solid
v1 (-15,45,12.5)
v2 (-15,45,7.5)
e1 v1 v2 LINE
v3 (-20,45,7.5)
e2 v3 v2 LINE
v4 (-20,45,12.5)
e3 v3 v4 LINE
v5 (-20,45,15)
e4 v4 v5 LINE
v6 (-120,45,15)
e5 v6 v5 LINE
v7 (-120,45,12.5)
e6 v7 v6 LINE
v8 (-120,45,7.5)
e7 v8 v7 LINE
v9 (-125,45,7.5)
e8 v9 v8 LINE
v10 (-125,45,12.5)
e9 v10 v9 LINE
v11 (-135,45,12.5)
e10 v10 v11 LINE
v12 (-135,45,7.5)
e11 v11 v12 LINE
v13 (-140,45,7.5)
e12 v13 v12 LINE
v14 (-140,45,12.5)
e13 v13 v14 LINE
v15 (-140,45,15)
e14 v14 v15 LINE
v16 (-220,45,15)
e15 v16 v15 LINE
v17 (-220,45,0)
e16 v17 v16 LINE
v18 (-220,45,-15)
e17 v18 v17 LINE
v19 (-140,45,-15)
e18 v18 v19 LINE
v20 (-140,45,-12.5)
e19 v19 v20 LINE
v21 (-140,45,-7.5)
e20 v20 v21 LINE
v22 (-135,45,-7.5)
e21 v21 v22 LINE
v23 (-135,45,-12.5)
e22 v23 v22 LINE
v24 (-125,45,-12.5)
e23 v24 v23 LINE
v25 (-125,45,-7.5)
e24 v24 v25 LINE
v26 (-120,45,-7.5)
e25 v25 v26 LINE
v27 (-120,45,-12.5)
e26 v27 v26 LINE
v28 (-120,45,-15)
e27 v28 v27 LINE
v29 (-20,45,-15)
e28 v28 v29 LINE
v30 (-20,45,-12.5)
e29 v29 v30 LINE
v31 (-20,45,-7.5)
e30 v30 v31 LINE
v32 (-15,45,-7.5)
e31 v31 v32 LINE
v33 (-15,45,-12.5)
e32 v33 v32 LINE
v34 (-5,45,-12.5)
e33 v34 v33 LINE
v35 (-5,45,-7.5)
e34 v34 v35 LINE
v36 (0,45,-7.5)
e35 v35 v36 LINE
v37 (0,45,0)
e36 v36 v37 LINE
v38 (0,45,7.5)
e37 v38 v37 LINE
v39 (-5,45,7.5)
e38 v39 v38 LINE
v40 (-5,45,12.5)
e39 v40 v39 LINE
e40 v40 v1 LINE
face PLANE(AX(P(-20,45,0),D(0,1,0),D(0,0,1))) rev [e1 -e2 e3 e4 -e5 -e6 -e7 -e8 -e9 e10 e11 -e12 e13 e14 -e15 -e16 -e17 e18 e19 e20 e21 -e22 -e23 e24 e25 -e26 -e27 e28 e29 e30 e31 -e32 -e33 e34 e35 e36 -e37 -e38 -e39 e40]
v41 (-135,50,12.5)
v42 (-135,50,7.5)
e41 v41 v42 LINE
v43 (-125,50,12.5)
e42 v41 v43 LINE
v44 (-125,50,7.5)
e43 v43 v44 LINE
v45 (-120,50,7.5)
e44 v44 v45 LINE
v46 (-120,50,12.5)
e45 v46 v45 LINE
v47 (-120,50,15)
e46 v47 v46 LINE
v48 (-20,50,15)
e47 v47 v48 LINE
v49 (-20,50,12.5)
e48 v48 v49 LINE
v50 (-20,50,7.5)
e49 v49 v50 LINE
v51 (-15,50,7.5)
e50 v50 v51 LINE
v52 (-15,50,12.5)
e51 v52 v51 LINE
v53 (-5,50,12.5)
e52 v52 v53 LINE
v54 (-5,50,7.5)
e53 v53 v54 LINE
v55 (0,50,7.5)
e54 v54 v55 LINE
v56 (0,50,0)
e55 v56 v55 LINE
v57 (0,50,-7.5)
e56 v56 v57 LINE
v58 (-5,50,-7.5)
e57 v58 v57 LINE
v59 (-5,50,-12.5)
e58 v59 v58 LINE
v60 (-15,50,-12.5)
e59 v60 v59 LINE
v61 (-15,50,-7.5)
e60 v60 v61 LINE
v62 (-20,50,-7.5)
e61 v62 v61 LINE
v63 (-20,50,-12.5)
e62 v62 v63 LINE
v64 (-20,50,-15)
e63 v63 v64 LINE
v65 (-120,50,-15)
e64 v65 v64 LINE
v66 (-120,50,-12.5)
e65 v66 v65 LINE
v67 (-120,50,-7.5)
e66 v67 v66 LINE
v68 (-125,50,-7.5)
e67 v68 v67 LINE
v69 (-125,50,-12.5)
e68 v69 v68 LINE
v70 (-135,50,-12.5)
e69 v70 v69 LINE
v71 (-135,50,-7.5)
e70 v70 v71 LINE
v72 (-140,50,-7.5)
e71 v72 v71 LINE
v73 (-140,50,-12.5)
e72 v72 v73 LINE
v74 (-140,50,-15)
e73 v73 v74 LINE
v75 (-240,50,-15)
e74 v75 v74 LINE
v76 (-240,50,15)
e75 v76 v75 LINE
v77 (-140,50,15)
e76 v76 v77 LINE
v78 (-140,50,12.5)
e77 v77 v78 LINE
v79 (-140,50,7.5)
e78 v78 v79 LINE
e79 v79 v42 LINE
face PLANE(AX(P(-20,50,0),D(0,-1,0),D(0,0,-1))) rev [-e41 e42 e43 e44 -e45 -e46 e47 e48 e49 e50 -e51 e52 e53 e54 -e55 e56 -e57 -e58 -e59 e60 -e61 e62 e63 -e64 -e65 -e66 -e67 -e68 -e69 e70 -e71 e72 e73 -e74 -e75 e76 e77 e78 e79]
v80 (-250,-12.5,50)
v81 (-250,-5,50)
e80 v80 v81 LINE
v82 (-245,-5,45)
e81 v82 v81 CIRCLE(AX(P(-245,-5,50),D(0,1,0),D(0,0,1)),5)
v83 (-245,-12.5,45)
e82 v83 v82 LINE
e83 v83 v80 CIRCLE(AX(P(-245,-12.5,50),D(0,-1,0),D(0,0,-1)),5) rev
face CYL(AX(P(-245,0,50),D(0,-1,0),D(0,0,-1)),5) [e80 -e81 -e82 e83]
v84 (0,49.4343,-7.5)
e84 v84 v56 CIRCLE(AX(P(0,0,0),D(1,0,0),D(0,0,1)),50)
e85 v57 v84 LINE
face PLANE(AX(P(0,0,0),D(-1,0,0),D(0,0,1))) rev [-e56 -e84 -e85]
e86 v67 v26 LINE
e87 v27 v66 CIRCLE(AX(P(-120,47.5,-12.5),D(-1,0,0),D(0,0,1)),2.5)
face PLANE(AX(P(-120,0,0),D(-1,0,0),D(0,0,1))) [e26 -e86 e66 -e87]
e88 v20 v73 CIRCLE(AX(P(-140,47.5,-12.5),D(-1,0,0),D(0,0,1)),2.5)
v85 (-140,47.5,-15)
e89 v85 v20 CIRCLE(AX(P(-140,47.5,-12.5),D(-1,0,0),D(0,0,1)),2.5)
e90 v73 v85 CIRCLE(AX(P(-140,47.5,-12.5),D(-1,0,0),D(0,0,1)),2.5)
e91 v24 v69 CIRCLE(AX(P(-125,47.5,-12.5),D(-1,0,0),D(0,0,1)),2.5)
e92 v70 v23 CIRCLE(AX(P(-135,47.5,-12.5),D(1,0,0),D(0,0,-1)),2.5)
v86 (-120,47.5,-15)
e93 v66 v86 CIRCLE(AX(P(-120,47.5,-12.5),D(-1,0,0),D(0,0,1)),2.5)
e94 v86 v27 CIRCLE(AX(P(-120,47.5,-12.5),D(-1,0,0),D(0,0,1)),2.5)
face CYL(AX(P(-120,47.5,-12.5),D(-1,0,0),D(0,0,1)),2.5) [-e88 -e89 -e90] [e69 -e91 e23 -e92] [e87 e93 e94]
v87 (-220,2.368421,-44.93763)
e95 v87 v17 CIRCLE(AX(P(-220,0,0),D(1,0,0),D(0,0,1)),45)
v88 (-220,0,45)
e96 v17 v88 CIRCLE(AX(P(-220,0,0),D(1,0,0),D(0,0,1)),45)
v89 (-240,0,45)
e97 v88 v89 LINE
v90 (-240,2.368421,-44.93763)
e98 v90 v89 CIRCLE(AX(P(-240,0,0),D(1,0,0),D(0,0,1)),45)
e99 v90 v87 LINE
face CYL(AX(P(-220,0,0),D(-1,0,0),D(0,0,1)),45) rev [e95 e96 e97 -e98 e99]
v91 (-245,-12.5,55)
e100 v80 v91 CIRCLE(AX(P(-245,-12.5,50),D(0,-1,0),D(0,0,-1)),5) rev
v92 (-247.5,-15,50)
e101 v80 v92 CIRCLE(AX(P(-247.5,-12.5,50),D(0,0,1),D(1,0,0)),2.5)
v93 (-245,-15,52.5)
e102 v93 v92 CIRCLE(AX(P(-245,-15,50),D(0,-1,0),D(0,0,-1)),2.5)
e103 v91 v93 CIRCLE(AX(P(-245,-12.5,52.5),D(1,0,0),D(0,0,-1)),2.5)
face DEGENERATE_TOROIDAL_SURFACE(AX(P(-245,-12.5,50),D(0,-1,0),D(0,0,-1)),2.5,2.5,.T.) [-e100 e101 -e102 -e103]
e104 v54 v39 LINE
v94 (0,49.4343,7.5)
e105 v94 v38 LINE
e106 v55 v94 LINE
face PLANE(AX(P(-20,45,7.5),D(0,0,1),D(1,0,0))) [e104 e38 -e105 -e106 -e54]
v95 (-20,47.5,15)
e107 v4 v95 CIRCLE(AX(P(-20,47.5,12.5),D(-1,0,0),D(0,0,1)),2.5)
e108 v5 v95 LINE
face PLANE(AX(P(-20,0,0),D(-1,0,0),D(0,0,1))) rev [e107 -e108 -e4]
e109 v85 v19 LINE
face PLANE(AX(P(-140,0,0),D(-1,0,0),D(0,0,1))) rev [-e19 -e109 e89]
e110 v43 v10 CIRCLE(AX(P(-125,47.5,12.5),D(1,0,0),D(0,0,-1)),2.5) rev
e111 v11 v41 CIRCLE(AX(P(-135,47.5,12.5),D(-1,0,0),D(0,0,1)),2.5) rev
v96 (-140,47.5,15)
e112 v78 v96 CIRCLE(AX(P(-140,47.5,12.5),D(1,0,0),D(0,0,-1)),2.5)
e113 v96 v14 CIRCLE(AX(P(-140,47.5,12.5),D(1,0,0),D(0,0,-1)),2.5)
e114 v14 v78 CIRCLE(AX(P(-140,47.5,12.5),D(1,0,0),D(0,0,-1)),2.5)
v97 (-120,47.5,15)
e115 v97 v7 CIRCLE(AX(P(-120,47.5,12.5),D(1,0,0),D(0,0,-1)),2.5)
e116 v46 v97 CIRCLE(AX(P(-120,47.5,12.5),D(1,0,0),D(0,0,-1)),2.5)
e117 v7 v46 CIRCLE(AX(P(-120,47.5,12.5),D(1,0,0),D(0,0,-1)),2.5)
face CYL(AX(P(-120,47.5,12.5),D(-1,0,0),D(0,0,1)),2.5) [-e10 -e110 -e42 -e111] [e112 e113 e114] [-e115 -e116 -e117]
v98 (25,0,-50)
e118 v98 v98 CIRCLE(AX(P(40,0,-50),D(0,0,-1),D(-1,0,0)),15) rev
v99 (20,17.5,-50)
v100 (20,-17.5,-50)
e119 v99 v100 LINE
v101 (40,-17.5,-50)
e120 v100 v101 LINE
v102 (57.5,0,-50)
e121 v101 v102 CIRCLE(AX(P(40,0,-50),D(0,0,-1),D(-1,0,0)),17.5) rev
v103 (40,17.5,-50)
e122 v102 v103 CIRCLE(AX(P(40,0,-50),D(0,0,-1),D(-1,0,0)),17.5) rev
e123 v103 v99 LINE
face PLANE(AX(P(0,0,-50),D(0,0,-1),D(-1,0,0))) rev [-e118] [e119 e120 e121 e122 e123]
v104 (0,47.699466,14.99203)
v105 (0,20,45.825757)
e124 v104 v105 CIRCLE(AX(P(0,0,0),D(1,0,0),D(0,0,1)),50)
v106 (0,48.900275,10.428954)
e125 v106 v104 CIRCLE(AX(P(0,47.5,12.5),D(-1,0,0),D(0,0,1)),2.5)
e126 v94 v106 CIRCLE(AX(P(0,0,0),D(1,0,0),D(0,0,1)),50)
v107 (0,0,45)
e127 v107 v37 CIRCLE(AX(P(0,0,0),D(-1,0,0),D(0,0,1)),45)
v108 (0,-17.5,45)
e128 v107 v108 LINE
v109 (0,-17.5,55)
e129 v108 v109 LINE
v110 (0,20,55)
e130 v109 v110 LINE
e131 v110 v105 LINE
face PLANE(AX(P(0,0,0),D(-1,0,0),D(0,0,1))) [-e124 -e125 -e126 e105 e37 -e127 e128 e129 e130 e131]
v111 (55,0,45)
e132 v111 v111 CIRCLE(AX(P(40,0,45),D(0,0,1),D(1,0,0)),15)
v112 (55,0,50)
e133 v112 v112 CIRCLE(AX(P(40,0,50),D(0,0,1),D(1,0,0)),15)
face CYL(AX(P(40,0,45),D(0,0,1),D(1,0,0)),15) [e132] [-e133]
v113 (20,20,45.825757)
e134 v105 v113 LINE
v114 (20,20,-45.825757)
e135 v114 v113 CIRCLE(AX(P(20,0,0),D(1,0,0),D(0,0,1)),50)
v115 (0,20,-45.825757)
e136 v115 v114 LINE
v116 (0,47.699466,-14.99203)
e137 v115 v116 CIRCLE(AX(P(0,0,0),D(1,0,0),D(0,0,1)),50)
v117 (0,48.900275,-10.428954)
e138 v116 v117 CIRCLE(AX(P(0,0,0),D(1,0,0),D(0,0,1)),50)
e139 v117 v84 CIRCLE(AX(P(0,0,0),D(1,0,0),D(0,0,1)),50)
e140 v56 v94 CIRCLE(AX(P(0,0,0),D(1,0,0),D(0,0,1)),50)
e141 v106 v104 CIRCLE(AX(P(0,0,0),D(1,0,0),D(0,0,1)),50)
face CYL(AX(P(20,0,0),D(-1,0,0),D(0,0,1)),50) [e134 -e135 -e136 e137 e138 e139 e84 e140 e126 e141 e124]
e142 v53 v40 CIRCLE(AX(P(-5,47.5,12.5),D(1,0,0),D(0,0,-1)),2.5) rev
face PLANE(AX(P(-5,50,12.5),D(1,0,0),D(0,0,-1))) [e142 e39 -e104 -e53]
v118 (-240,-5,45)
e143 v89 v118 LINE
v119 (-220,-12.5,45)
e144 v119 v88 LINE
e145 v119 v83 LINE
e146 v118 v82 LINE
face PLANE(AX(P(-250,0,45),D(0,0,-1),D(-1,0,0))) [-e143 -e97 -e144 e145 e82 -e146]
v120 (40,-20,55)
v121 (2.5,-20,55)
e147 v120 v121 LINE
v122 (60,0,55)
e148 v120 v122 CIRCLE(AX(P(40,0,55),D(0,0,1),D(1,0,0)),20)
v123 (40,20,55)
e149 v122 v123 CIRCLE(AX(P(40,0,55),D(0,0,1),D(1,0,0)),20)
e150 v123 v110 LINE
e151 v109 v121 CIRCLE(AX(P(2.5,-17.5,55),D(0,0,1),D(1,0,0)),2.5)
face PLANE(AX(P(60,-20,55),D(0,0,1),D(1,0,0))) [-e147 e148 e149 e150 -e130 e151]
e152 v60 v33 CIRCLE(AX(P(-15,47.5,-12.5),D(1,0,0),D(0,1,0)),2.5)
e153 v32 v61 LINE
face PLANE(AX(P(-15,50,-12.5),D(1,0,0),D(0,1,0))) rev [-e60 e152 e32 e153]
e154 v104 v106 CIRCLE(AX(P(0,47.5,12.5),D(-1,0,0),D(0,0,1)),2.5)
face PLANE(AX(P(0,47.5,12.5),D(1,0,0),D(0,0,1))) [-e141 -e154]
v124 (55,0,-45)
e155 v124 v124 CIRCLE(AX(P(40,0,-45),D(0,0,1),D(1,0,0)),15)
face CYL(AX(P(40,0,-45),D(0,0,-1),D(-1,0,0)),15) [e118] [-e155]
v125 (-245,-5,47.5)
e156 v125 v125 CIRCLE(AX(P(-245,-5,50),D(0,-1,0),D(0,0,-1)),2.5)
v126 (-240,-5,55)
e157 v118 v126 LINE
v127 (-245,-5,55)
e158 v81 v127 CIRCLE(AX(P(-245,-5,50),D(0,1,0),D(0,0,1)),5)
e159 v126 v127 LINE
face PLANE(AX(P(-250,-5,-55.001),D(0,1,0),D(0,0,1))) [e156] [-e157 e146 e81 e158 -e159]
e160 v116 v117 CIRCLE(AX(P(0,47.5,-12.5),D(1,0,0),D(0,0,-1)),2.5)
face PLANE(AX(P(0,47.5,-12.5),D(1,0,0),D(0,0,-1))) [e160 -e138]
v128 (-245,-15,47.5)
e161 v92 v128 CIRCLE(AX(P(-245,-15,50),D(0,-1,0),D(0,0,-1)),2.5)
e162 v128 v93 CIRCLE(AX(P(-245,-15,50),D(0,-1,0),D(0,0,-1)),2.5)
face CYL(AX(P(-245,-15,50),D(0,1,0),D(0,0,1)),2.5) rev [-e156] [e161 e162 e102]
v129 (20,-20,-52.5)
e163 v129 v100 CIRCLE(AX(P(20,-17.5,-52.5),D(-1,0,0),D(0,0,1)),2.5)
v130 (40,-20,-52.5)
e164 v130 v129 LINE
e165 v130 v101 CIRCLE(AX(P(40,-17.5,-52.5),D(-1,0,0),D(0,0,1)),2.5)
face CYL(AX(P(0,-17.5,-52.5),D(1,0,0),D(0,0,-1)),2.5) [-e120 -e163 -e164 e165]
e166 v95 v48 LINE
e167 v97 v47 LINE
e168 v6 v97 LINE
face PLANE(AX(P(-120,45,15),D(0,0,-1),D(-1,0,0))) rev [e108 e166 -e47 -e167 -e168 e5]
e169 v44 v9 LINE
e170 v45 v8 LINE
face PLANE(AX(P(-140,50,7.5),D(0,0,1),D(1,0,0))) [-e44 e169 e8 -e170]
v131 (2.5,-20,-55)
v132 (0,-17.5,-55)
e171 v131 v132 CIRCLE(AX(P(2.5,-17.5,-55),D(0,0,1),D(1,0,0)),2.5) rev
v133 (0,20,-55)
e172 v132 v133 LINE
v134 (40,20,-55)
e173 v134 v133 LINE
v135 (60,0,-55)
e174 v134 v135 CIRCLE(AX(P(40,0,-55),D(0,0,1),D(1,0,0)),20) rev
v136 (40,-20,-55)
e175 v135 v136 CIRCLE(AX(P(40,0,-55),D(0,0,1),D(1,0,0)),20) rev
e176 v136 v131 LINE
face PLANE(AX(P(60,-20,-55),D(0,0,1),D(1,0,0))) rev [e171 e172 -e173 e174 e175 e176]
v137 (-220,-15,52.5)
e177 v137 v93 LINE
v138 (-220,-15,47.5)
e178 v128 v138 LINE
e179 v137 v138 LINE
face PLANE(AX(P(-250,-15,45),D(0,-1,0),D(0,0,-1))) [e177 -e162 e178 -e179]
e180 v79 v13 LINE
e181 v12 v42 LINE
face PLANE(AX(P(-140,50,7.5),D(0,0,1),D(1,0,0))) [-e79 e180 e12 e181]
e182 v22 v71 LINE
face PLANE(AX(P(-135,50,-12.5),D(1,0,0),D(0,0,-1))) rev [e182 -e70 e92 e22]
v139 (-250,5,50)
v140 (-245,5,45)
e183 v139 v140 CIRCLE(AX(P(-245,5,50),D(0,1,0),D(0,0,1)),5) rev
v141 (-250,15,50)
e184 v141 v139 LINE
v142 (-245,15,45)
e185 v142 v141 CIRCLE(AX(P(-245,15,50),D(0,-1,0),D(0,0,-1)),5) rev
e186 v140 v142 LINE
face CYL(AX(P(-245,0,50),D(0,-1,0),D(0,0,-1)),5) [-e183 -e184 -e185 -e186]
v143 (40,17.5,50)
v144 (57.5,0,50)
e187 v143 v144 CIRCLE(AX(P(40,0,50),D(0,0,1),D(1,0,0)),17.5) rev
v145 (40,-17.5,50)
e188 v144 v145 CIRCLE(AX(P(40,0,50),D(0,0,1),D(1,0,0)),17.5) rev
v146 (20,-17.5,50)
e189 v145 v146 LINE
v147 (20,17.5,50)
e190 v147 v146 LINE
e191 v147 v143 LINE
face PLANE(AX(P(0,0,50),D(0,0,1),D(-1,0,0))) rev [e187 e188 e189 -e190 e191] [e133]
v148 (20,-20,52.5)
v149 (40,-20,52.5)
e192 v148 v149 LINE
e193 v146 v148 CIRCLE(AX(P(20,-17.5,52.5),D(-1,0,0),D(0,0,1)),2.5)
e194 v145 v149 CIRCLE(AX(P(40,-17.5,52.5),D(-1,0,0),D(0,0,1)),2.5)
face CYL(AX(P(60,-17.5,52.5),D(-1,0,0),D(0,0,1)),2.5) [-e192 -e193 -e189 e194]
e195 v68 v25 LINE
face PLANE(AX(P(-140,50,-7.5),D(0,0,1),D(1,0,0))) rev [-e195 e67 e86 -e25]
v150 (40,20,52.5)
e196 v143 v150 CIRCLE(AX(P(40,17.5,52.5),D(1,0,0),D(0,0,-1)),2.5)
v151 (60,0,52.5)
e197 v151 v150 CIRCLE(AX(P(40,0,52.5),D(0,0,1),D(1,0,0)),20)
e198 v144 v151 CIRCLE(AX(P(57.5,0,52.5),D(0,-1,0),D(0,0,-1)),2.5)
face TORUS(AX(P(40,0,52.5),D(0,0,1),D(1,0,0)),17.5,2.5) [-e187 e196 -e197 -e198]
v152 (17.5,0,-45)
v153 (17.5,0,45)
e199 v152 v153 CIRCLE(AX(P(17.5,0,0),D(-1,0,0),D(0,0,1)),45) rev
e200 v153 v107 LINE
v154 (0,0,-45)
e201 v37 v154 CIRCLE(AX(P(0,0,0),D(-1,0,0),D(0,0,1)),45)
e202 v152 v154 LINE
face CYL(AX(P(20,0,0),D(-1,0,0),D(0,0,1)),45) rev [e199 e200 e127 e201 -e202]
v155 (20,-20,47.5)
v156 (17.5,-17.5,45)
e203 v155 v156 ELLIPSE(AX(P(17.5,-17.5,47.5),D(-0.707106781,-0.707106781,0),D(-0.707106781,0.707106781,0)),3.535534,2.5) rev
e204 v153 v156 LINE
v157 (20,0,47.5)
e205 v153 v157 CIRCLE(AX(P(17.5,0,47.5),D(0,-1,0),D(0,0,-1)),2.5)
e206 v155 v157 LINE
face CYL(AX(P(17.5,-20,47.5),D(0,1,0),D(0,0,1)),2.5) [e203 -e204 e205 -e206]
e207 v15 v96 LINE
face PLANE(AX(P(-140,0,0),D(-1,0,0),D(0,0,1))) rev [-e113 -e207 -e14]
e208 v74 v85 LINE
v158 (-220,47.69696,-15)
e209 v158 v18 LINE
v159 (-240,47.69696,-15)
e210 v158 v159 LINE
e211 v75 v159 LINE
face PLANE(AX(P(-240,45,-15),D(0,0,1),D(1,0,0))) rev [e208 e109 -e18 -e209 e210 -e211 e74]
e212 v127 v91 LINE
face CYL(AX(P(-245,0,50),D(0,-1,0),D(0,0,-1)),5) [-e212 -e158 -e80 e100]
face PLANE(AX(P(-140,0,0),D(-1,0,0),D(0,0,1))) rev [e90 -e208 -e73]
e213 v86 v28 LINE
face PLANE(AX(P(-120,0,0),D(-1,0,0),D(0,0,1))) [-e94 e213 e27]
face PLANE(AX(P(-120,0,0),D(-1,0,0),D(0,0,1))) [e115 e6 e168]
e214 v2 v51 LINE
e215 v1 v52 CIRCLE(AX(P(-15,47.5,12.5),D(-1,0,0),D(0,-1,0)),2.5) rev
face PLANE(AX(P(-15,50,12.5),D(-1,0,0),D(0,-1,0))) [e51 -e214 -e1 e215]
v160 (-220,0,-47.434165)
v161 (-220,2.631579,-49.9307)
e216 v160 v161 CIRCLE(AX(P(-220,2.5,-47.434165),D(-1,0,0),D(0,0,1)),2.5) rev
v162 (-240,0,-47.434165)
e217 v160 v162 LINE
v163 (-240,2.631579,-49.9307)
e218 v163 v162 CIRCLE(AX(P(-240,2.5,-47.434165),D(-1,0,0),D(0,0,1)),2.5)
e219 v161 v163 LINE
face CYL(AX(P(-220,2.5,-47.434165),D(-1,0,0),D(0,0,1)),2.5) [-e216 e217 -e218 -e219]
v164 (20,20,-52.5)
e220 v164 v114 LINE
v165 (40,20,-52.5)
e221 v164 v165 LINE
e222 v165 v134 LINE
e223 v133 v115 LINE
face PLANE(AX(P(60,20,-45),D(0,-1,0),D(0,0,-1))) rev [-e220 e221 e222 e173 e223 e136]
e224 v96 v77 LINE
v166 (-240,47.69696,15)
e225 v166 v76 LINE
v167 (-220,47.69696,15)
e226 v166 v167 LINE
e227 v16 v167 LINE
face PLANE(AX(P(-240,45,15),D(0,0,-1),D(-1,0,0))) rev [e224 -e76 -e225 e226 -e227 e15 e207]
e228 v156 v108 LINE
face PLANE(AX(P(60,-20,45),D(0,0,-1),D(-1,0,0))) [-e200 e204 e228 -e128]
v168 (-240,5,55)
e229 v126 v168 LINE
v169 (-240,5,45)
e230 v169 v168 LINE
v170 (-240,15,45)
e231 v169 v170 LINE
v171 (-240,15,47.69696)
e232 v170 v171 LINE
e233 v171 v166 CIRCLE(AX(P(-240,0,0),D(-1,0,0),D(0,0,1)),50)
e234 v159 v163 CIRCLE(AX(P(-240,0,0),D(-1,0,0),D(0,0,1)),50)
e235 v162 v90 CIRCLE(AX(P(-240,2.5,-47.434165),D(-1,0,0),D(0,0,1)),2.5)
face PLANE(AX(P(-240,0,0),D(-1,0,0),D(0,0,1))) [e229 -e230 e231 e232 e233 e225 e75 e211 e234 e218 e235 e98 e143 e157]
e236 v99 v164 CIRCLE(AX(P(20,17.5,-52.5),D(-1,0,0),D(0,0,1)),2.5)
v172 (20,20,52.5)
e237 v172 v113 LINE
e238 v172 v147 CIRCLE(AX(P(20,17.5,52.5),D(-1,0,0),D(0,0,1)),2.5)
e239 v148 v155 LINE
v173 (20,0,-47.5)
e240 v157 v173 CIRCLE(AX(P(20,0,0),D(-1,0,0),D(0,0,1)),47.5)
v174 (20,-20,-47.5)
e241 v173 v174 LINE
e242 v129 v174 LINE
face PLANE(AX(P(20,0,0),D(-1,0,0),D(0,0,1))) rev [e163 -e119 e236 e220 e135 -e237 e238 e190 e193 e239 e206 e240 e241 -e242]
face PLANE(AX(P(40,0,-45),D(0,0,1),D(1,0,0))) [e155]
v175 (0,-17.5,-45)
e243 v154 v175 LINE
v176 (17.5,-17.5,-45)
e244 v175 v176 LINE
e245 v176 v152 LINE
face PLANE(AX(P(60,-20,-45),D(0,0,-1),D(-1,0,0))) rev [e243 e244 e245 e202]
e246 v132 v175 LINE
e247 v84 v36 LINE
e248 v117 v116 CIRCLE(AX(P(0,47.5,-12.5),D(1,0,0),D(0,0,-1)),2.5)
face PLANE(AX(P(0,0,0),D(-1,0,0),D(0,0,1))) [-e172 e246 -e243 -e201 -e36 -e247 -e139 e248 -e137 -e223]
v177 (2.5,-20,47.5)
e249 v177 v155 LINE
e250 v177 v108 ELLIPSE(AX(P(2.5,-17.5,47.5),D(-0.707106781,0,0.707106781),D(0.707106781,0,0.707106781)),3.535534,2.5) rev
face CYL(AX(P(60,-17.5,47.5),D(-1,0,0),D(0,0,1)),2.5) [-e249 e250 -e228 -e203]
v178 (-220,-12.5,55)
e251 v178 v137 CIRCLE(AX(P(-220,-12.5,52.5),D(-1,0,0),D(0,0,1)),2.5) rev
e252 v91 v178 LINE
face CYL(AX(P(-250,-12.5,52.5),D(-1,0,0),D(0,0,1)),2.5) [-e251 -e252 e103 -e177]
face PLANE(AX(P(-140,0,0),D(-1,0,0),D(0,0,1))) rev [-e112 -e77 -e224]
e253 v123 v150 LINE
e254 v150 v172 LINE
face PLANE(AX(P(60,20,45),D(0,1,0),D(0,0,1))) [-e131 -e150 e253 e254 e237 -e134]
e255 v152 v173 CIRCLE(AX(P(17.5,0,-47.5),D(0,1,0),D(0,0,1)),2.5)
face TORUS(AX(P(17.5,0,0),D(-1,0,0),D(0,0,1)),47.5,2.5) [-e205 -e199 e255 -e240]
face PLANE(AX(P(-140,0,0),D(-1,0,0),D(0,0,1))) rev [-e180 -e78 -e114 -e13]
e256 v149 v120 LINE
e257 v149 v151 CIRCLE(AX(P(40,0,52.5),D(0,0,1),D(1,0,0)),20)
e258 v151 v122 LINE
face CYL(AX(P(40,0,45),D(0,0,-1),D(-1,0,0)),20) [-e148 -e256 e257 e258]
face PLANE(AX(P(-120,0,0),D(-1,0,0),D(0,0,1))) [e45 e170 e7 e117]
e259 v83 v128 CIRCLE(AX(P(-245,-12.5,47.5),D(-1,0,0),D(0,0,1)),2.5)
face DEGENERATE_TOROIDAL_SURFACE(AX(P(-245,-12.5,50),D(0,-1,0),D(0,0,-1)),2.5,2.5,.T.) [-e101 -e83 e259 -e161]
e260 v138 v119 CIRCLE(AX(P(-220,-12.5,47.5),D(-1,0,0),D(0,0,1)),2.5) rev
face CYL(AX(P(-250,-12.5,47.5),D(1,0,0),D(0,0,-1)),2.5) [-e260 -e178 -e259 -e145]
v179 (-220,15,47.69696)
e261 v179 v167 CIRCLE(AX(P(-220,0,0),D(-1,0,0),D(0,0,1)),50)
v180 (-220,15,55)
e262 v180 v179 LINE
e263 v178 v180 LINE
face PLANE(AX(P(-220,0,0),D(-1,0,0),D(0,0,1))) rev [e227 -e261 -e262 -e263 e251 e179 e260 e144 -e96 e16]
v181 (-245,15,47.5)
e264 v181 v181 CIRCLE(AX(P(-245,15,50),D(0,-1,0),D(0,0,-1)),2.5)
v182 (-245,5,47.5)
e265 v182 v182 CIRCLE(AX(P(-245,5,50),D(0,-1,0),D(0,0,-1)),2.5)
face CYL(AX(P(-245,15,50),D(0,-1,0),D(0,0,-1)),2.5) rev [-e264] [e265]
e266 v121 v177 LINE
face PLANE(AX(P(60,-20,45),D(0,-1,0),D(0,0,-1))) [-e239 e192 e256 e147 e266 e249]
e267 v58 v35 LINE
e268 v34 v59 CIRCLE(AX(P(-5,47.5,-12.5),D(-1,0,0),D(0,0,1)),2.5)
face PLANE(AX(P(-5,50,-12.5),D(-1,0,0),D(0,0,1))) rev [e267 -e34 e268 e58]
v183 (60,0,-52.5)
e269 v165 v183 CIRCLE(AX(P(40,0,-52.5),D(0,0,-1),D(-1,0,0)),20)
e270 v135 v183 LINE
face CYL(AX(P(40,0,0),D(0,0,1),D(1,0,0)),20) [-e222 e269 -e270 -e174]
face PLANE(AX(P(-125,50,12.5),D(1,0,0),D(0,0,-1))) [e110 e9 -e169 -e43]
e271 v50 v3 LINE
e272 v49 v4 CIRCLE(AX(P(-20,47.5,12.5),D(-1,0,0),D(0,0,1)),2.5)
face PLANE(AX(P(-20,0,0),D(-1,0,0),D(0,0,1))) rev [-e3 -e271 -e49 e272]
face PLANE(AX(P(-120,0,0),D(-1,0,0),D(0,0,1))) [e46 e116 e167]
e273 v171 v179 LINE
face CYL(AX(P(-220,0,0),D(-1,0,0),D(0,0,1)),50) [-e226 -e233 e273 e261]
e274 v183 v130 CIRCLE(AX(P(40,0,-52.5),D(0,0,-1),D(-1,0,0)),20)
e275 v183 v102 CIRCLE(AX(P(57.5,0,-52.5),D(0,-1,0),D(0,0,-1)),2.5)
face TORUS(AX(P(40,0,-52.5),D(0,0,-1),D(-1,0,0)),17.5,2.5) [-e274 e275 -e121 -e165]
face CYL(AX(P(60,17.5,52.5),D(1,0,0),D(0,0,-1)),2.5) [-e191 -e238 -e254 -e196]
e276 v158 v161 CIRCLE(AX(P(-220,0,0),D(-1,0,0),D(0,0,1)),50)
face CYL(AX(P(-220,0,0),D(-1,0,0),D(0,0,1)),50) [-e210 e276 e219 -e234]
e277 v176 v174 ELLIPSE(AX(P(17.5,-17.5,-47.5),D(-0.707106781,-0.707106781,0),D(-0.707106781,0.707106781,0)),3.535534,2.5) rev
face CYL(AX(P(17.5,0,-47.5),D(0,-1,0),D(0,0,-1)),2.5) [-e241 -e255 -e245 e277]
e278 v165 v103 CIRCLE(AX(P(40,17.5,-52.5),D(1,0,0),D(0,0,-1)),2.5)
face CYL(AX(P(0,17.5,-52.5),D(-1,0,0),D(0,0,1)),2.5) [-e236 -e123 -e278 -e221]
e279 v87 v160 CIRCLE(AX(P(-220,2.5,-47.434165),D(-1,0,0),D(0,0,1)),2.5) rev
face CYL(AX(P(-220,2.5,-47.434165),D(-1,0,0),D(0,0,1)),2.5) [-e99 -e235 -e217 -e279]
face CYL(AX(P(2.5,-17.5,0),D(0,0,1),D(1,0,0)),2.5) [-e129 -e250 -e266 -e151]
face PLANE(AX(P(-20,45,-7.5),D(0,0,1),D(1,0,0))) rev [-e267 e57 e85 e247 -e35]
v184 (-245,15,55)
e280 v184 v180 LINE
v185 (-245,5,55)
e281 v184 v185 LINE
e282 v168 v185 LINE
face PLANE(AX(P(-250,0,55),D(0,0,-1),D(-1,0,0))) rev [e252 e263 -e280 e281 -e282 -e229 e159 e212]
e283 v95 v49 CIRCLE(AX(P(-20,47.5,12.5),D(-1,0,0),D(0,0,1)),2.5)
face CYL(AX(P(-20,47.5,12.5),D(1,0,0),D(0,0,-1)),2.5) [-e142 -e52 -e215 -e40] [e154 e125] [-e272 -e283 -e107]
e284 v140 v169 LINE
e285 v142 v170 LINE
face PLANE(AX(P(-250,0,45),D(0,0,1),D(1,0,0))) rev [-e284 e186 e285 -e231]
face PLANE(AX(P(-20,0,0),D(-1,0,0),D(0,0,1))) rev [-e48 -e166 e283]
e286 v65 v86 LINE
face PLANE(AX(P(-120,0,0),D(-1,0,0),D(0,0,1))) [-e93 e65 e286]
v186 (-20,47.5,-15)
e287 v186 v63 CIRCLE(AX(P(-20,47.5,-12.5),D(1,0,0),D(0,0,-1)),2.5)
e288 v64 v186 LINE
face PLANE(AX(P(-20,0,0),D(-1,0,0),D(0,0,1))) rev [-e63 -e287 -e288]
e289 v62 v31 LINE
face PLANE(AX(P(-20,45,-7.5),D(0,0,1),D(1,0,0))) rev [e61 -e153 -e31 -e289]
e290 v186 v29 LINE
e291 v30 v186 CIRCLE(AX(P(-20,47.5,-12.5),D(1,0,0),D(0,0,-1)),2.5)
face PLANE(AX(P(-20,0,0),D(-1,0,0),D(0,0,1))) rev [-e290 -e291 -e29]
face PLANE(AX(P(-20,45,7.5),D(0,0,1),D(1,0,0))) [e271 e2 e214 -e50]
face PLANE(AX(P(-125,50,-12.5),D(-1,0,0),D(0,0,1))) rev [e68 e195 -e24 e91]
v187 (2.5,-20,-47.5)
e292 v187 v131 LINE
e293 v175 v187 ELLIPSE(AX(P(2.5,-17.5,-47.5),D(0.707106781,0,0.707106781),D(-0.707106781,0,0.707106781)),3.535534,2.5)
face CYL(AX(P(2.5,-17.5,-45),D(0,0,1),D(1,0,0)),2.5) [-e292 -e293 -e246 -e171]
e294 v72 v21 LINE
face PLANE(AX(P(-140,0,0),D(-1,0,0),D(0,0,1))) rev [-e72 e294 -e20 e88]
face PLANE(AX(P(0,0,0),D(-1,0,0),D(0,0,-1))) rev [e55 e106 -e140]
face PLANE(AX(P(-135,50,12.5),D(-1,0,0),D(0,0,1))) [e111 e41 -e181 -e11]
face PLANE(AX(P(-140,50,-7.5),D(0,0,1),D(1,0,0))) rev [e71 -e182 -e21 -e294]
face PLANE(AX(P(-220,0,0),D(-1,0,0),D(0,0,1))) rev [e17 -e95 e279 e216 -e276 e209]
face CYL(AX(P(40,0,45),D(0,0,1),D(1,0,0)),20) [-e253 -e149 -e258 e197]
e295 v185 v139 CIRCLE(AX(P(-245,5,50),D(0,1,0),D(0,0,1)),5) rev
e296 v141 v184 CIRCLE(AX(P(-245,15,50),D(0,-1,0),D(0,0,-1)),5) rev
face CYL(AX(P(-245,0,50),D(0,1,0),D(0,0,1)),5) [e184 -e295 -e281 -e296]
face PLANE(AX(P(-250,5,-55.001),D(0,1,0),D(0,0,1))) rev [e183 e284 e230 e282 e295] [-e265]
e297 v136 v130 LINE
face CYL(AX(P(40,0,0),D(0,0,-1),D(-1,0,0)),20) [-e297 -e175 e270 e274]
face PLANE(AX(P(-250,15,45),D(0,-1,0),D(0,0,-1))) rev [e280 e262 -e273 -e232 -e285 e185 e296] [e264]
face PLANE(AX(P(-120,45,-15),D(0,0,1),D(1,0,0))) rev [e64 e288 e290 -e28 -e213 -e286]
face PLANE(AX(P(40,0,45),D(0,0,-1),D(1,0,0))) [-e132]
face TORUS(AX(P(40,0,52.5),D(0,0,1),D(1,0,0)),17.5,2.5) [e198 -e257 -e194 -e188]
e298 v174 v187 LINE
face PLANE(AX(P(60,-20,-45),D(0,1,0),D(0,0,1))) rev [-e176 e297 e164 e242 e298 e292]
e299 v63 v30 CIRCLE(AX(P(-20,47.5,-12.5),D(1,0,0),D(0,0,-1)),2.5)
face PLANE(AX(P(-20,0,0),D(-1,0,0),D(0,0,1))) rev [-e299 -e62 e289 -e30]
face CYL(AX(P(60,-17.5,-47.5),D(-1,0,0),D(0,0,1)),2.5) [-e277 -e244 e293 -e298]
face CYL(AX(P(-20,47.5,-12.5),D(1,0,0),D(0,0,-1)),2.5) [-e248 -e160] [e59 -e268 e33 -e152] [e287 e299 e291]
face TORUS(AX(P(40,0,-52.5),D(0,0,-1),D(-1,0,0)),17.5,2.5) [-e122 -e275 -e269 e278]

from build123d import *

# Parameters (mm, degrees)
BOSS_EXTRUDE1_DEPTH  = 20
SKETCH3_W            = 10
SKETCH3_H            = 40
BOSS_EXTRUDE2_DEPTH  = 60
SKETCH4_W            = 40
SKETCH4_H            = 40
CUT_EXTRUDE1_DEPTH   = 5
SKETCH5_R            = 15
BOSS_EXTRUDE3_DEPTH  = 5
SKETCH6_W            = 7.5
SKETCH6_H            = 5
BOSS_EXTRUDE4_DEPTH  = 20
SKETCH7_W            = 10
SKETCH7_H            = 5
BOSS_EXTRUDE5_DEPTH  = 5
SKETCH9_R            = 2.5
BOSS_EXTRUDE6_DEPTH  = 20
FILLET2_R            = 2.5
FILLET3_R            = 20
FILLET4_R            = 2.5
SKETCH10_W           = 30
SKETCH10_H           = 5
BOSS_EXTRUDE9_DEPTH  = 100
SKETCH12_W           = 7.5
SKETCH12_H           = 5
BOSS_EXTRUDE10_DEPTH = 20
SKETCH13_W           = 10
SKETCH13_H           = 5
BOSS_EXTRUDE11_DEPTH = 5
BOSS_EXTRUDE12_START = -15
SKETCH14_R           = 2.5
BOSS_EXTRUDE12_DEPTH = 20
SKETCH15_W           = 30
SKETCH15_H           = 5
BOSS_EXTRUDE13_DEPTH = 100
BOSS_EXTRUDE14_DEPTH = 20
BOSS_EXTRUDE15_START = -20
SKETCH17_W           = 10
SKETCH17_H           = 15
BOSS_EXTRUDE15_DEPTH = 30
CUT_EXTRUDE2_REACH   = 279.669
SKETCH18_W           = 10
SKETCH18_H           = 5
SKETCH19_R           = 2.5
CUT_EXTRUDE3_DEPTH   = 10
FILLET5_R            = 5
FILLET6_R            = 2.5


# Some blends are built 0.0001 mm under size
with BuildPart() as part:
    # Sketch1 → Boss-Extrude1 (new body)
    with BuildSketch(Plane(origin=(0, 0, 0), x_dir=(0, 0, -1), z_dir=(1, 0, 0))):
        with BuildLine():
            Line((-45, 0), (-50, 0))
            ThreePointArc((-50, 0), (0, 50), (50, 0))
            Line((50, 0), (45, 0))
            ThreePointArc((45, 0), (0, 45), (-45, 0))
        make_face()
    extrude(amount=BOSS_EXTRUDE1_DEPTH)

    # Sketch3 → Boss-Extrude2 (add)
    with BuildSketch(Plane(origin=(0, 0, 0), x_dir=(0, 0, -1), z_dir=(1, 0, 0))):
        with Locations((50, 0)):
            Rectangle(SKETCH3_W, SKETCH3_H)
    boss_extrude2 = extrude(amount=BOSS_EXTRUDE2_DEPTH)

    # Sketch4 → Cut-Extrude1 (cut)
    with BuildSketch(Plane.XY.offset(-45)):
        with Locations((40, 0)):
            Rectangle(SKETCH4_W, SKETCH4_H)
    cut_extrude1 = extrude(amount=-CUT_EXTRUDE1_DEPTH, mode=Mode.SUBTRACT)

    # Sketch5 → Boss-Extrude3 (add)
    with BuildSketch(Plane.XY.offset(-50)):
        with Locations(Location((40, 0, 0), (0, 0, 180))):
            Circle(SKETCH5_R)
    boss_extrude3 = extrude(amount=BOSS_EXTRUDE3_DEPTH)

    # Sketch6 → Boss-Extrude4 (add)
    with BuildSketch(Plane.ZY):
        with Locations((-3.75, 47.5)):
            Rectangle(SKETCH6_W, SKETCH6_H)
    boss_extrude4 = extrude(amount=BOSS_EXTRUDE4_DEPTH)

    # Sketch7 → Boss-Extrude5 (add)
    with BuildSketch(Plane(origin=(0, 0, -7.5), x_dir=(-1, 0, 0), z_dir=(0, 0, -1))):
        with Locations((10, 47.5)):
            Rectangle(SKETCH7_W, SKETCH7_H)
    boss_extrude5 = extrude(amount=BOSS_EXTRUDE5_DEPTH)

    # Sketch9 → Boss-Extrude6 (add)
    with BuildSketch(Plane(origin=(0, 0, 0), x_dir=(0, 0, -1), z_dir=(1, 0, 0))):
        with Locations((12.5, 47.5)):
            Circle(SKETCH9_R)
    boss_extrude6 = extrude(amount=-BOSS_EXTRUDE6_DEPTH)

    # Mirror1: Boss-Extrude2, Cut-Extrude1, Boss-Extrude3, Boss-Extrude4, Boss-Extrude5, Boss-Extrude6 across plane
    add(boss_extrude2.mirror(Plane.XY))
    add(cut_extrude1.mirror(Plane.XY), mode=Mode.SUBTRACT)
    add(boss_extrude3.mirror(Plane.XY))
    add(boss_extrude4.mirror(Plane.XY))
    add(boss_extrude5.mirror(Plane.XY))
    add(boss_extrude6.mirror(Plane.XY))

    # Fillet2
    fillet2_edges = [part.edges().sort_by_distance(p)[0] for p in [
        (20, 45, 0),
        (10, -20, 45),
        (20, -10, 45),
        (0, -20, -50),
        (10, -20, -45),
        (20, -10, -45),
        (0, -20, 50),
    ]]
    fillet(fillet2_edges, radius=FILLET2_R)

    # Fillet3
    fillet3_edges = [part.edges().sort_by_distance(p)[0] for p in [
        (60, -20, -52.5),
        (60, 20, -52.5),
        (60, -20, 52.5),
        (60, 20, 52.5),
    ]]
    fillet(fillet3_edges, radius=FILLET3_R - 0.0001)  # a hair under: the kernel refuses the full size

    # Fillet4
    fillet4_edges = [part.edges().sort_by_distance(p)[0] for p in [
        (30.00005, -20, 50),
        (30.00005, 20, -50),
        (54.142164913, 14.142164913, -50),
        (54.142164913, -14.142164913, -50),
        (30.00005, 20, 50),
        (54.142164913, 14.142164913, 50),
        (54.142164913, -14.142164913, 50),
        (30.00005, -20, -50),
    ]]
    fillet(fillet4_edges, radius=FILLET4_R)

    # Sketch10 → Boss-Extrude9 (add)
    with BuildSketch(Plane.ZY.offset(20)):
        with Locations((0, 47.5)):
            Rectangle(SKETCH10_W, SKETCH10_H)
    extrude(amount=BOSS_EXTRUDE9_DEPTH)

    # Sketch12 → Boss-Extrude10 (add)
    with BuildSketch(Plane.ZY.offset(120)):
        with Locations((-3.75, 47.5)):
            Rectangle(SKETCH12_W, SKETCH12_H)
    boss_extrude10 = extrude(amount=BOSS_EXTRUDE10_DEPTH)

    # Sketch13 → Boss-Extrude11 (add)
    with BuildSketch(Plane(origin=(0, 0, -7.5), x_dir=(-1, 0, 0), z_dir=(0, 0, -1))):
        with Locations((130, 47.5)):
            Rectangle(SKETCH13_W, SKETCH13_H)
    boss_extrude11 = extrude(amount=BOSS_EXTRUDE11_DEPTH)

    # Sketch14 → Boss-Extrude12 (add)
    with BuildSketch(Plane.ZY.offset(135).offset(BOSS_EXTRUDE12_START)):
        with Locations(Location((-12.5, 47.5, 0), (0, 0, 180))):
            Circle(SKETCH14_R)
    boss_extrude12 = extrude(amount=BOSS_EXTRUDE12_DEPTH)

    # Mirror2: Boss-Extrude10, Boss-Extrude11, Boss-Extrude12 across plane
    add(boss_extrude10.mirror(Plane(origin=(-140, 50, 0), x_dir=(1, 0, 0), z_dir=(0, 0, -1))))
    add(boss_extrude11.mirror(Plane(origin=(-140, 50, 0), x_dir=(1, 0, 0), z_dir=(0, 0, -1))))
    add(boss_extrude12.mirror(Plane(origin=(-140, 50, 0), x_dir=(1, 0, 0), z_dir=(0, 0, -1))))

    # Sketch15 → Boss-Extrude13 (add)
    with BuildSketch(Plane.ZY.offset(140)):
        with Locations((0, 47.5)):
            Rectangle(SKETCH15_W, SKETCH15_H)
    extrude(amount=BOSS_EXTRUDE13_DEPTH)

    # Sketch16 → Boss-Extrude14 (add)
    with BuildSketch(Plane.ZY.offset(240)):
        with BuildLine():
            Line((50, 0), (45, 0))
            ThreePointArc((45, 0), (0, 45), (-45, 0))
            Line((-45, 0), (-50, 0))
            ThreePointArc((-50, 0), (0, 50), (50, 0))
        make_face()
    extrude(amount=-BOSS_EXTRUDE14_DEPTH)

    # Sketch17 → Boss-Extrude15 (add)
    with BuildSketch(Plane.ZY.offset(240).offset(BOSS_EXTRUDE15_START)):
        with Locations((50, 7.5)):
            Rectangle(SKETCH17_W, SKETCH17_H)
    boss_extrude15 = extrude(amount=BOSS_EXTRUDE15_DEPTH)

    # Sketch18 → Cut-Extrude2 (cut, up to next)
    with BuildSketch(Plane.XY.offset(55), mode=Mode.PRIVATE) as cut_extrude2_sk1:
        with Locations((-245, 2.5)):
            Rectangle(SKETCH18_W, SKETCH18_H)
    cut_extrude2_tool1 = extrude(cut_extrude2_sk1.sketch, amount=-CUT_EXTRUDE2_REACH, mode=Mode.PRIVATE) & part.part
    cut_extrude2 = cut_extrude2_tool1.solids().sort_by_distance((-245, 2.5, 55))[0]
    add(cut_extrude2, mode=Mode.SUBTRACT)

    # Sketch19 → Cut-Extrude3 (cut)
    with BuildSketch(Plane.XZ.offset(-5)):
        with Locations(Location((-245, 50, 0), (0, 0, 270))):
            Circle(SKETCH19_R)
    cut_extrude3 = extrude(amount=-CUT_EXTRUDE3_DEPTH, mode=Mode.SUBTRACT)

    # Mirror3: Boss-Extrude15, Cut-Extrude2, Cut-Extrude3 across Top Plane
    add(boss_extrude15.mirror(Plane(origin=(0, 0, 0), x_dir=(1, 0, 0), z_dir=(0, 1, 0))))
    add(cut_extrude2.mirror(Plane(origin=(0, 0, 0), x_dir=(1, 0, 0), z_dir=(0, 1, 0))), mode=Mode.SUBTRACT)
    add(cut_extrude3.mirror(Plane(origin=(0, 0, 0), x_dir=(1, 0, 0), z_dir=(0, 1, 0))), mode=Mode.SUBTRACT)

    # Fillet5
    fillet5_edges = [part.edges().sort_by_distance(p)[0] for p in [
        (-250, -10, 45),
        (-250, -10, 55),
        (-250, 10, 55),
        (-250, 10, 45),
    ]]
    fillet(fillet5_edges, radius=FILLET5_R - 0.0001)  # a hair under: the kernel refuses the full size

    # Fillet6
    # the kernel refuses this fillet: 2.5 mm, written as the material it takes off along each edge
    with BuildSketch(Plane(origin=(-246.581228163, 0, -50), x_dir=(0, 0, 1), z_dir=(1, 0, 0))) as fillet6_piece_1:
        with BuildLine():
            CenterArc((2.565835097, -2.5), FILLET6_R, 90, 93.01696131)
            ThreePointArc((0.069300103, -2.631578947), (0.017328028, -1.316245633), (0, 0))
            Line((0, 0), (2.565835097, 0))
        make_face()
    extrude(amount=33.162456325, mode=Mode.SUBTRACT)
    with BuildSketch(Plane(origin=(-246.085412256, 0, -45), x_dir=(0, 0.9996534394348647, 0.026324912650289762), z_dir=(1, 0, 0))) as fillet6_piece_2:
        with BuildLine():
            CenterArc((2.43505442, -2.499133599), FILLET6_R, 91.508480655, 86.98303869)
            Line((-0.064079178, -2.433321317), (0, 0))
            ThreePointArc((0, 0), (1.184621069, -0.015595225), (2.369242139, 0))
        make_face()
    extrude(amount=32.170824513, mode=Mode.SUBTRACT)
    with BuildSketch(Plane(origin=(-213.75, -15, 45), x_dir=(0, 0, 1), z_dir=(-1, 0, 0)), Plane(origin=(-213.75, -15, 55), x_dir=(0, 1, 0), z_dir=(-1, 0, 0))) as fillet6_piece_3:
        with BuildLine():
            CenterArc((FILLET6_R, FILLET6_R), FILLET6_R, 180, 90)
            Line((0, FILLET6_R), (0, 0))
            Line((0, 0), (FILLET6_R, 0))
        make_face()
    extrude(amount=31.2501, mode=Mode.SUBTRACT)
    with BuildSketch(Plane(origin=(-245.0001, -15, 50.0001), x_dir=(0, 0, 1), z_dir=(1, 0, 0))) as fillet6_piece_4:
        with BuildLine():
            CenterArc((4.9999 - FILLET6_R, -FILLET6_R), FILLET6_R, 0, 90)
            Line((4.9999, -FILLET6_R), (4.9999, 0))
            Line((4.9999, 0), (4.9999 - FILLET6_R, 0))
        make_face()
    revolve(axis=Axis((-245.0001, -15, 50.0001), (0, -1, 0)), revolution_arc=90, mode=Mode.SUBTRACT)
    with BuildSketch(Plane(origin=(-245.0001, -15, 49.9999), x_dir=(0, 0, -1), z_dir=(1, 0, 0))) as fillet6_piece_5:
        with BuildLine():
            CenterArc((4.9999 - FILLET6_R, FILLET6_R), FILLET6_R, 270, 90)
            Line((4.9999, FILLET6_R), (4.9999, 0))
            Line((4.9999, 0), (4.9999 - FILLET6_R, 0))
        make_face()
    revolve(axis=Axis((-245.0001, -15, 49.9999), (0, 1, 0)), revolution_arc=90, mode=Mode.SUBTRACT)
    with BuildSketch(Plane(origin=(-250, -15, 50.0001), x_dir=(1, 0, 0), z_dir=(0, 0, -1))) as fillet6_piece_6:
        with BuildLine():
            CenterArc((FILLET6_R, -FILLET6_R), FILLET6_R, 90, 90)
            Line((0, -FILLET6_R), (0, 0))
            Line((0, 0), (FILLET6_R, 0))
        make_face()
    extrude(amount=0.0002, mode=Mode.SUBTRACT)


solid = part.part
